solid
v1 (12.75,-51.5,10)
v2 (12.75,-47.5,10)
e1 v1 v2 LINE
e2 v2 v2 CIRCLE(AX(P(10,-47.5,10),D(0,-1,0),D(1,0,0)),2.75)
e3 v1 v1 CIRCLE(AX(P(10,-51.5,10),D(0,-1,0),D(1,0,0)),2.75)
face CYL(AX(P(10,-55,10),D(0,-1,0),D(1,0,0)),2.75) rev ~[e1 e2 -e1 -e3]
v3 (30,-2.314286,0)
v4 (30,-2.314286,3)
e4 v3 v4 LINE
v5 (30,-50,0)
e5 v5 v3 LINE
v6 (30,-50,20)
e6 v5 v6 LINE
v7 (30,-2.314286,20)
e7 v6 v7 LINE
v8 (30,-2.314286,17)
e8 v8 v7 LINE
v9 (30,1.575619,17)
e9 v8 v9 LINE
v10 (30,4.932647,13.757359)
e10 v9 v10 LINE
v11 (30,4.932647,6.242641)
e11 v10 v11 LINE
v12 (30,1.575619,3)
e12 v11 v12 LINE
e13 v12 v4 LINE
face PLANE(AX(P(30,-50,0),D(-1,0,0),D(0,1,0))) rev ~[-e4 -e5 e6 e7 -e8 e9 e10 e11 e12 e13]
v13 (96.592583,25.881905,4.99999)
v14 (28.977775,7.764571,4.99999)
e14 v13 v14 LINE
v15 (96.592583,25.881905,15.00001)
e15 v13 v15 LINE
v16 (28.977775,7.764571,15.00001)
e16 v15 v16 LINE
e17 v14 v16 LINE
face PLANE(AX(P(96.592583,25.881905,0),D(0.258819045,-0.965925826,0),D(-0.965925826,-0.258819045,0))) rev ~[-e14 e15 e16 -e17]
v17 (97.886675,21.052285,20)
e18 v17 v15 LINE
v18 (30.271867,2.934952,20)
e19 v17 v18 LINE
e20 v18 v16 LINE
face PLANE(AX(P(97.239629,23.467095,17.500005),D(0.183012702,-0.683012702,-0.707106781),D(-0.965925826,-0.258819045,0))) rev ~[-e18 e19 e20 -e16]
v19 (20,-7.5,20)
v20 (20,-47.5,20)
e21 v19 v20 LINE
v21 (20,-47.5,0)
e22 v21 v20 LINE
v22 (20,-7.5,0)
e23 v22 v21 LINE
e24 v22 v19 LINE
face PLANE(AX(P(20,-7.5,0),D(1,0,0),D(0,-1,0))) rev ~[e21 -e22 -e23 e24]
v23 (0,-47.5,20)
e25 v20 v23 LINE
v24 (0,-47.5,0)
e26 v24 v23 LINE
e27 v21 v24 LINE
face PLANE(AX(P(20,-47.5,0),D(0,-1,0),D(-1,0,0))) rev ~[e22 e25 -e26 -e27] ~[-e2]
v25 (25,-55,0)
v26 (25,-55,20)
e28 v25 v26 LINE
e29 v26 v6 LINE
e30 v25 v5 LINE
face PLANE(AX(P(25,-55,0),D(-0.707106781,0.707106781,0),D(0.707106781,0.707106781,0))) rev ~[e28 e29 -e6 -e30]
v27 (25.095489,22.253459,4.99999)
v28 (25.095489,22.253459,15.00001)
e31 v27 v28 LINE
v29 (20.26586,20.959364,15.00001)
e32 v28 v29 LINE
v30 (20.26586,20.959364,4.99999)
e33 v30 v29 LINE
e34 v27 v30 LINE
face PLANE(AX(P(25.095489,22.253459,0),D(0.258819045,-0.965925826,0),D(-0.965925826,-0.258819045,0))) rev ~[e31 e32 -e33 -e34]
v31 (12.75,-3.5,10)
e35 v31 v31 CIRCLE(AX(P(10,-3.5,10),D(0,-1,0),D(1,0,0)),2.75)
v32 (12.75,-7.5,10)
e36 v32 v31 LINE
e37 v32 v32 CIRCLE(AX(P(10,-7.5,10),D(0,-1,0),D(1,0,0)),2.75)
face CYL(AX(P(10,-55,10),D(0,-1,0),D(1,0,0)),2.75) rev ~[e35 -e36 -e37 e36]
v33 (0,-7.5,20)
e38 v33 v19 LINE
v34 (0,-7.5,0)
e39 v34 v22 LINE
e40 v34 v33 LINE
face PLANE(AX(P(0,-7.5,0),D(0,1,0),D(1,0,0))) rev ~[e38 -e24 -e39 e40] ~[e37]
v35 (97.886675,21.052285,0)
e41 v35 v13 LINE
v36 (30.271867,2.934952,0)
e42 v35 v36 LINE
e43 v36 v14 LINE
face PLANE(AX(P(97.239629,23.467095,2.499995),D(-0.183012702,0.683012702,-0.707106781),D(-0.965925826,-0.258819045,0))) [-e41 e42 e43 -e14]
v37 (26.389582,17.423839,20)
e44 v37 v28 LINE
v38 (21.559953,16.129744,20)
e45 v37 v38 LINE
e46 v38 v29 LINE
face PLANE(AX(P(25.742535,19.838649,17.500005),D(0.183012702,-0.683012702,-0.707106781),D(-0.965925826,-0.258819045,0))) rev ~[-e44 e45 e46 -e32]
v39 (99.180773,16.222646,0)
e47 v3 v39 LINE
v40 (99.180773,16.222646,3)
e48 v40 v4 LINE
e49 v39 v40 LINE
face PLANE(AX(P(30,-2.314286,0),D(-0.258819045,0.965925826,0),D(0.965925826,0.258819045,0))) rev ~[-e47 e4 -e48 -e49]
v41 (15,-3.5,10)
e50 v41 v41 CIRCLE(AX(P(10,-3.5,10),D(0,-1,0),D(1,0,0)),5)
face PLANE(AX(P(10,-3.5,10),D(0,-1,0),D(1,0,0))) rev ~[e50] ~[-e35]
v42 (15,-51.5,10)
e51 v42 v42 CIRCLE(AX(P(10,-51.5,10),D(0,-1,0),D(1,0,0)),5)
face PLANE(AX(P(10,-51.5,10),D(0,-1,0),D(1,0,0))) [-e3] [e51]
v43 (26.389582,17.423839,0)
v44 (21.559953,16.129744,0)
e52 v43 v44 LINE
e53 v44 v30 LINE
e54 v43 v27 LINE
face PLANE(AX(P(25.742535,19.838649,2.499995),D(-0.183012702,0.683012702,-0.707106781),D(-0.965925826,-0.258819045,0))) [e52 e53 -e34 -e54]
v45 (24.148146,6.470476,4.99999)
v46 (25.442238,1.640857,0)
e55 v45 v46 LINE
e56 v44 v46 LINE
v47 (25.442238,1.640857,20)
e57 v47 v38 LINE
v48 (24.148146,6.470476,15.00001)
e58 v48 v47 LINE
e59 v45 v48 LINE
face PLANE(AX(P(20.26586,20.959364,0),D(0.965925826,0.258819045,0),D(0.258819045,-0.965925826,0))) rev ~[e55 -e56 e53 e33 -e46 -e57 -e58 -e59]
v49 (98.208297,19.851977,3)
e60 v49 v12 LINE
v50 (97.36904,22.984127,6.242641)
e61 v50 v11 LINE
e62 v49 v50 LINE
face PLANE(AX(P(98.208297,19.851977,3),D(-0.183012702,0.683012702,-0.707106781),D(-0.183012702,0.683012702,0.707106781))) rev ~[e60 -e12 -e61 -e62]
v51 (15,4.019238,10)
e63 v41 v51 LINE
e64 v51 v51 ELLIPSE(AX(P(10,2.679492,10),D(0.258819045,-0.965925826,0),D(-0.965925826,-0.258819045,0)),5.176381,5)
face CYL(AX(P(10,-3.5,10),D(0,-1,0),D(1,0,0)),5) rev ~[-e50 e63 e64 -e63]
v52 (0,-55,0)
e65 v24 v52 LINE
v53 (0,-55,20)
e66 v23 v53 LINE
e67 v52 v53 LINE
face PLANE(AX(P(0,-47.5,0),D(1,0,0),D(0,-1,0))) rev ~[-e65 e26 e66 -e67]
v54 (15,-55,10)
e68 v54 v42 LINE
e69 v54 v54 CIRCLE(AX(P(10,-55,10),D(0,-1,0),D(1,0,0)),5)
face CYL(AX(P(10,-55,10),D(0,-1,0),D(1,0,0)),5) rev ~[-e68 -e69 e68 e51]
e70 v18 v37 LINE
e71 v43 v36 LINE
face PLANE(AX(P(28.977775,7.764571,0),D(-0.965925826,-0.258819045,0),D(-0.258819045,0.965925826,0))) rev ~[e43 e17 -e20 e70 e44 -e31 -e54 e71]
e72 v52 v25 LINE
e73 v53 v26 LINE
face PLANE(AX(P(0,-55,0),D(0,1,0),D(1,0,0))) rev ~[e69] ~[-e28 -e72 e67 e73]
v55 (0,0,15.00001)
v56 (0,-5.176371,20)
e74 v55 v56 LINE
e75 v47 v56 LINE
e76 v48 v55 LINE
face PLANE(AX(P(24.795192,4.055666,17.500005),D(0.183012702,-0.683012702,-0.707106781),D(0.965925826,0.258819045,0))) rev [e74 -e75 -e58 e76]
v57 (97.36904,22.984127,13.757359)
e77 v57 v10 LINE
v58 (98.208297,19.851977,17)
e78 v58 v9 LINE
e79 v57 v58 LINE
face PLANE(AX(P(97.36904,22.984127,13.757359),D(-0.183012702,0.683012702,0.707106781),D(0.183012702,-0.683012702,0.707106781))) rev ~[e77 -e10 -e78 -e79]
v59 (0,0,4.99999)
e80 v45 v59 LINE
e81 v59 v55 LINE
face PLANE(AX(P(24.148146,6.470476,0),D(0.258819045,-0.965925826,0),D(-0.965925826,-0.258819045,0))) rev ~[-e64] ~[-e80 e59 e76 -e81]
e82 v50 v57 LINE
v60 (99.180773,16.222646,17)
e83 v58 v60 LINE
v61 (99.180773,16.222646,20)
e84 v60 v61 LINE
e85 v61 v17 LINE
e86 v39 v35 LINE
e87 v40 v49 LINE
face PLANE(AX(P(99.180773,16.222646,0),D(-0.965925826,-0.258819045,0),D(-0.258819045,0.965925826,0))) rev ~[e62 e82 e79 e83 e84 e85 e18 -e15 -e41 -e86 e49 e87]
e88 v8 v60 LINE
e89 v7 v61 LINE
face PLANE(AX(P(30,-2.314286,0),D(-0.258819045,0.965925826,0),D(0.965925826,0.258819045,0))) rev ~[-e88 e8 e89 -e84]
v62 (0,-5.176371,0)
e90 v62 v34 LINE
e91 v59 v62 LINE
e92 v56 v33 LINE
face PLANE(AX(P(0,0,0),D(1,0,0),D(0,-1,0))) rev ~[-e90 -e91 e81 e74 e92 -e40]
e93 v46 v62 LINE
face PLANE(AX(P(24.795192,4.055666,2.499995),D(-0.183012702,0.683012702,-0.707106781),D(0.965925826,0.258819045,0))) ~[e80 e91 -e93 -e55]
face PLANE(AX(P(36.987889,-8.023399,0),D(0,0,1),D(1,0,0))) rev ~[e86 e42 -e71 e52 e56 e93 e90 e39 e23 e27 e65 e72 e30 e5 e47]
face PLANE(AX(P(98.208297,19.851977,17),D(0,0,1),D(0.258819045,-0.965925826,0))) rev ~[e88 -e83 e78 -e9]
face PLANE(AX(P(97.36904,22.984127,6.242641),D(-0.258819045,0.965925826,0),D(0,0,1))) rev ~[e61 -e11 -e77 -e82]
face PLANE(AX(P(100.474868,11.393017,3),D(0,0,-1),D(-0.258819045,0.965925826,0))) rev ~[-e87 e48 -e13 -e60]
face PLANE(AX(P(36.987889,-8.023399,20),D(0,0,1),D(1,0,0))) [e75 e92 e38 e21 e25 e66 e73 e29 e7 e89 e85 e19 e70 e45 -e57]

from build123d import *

# Parameters (mm, degrees)
F1_DEPTH  = 20
F2_R      = 2.75
F3_DEPTH  = 80.8829045103
F5_R      = 5
F6_DEPTH  = 29.3829045103
F7_R      = 5
F8_DEPTH  = 3.5
F9_SIZE   = 4.99999
F11_REACH = 132.6751363952


# Not quite as in the source:
# - a fillet or chamfer is up to 0.001 mm smaller than in the source, because OpenCascade refuses the exact size


with BuildPart() as f1:
    # F0 (on Top) → F1 (new body)
    with BuildSketch(Plane.XY):
        Polygon((24.1481456572, 6.4704761276), (0, 0), (0, -7.5), (20, -7.5), (20, -47.5), (0, -47.5), (0, -55), (25, -55), (30, -50), (30, -2.3142860312), (99.1807730799, 16.2226462474), (96.5925826289, 25.8819045103), (28.9777747887, 7.7645713531), (25.0954891121, 22.2534587474), (20.2658599807, 20.9593635219), align=None)
    extrude(amount=F1_DEPTH)

    # F2 (on face) → F3 (cut, through all)
    with BuildSketch(Plane.XZ.offset(55)):
        with Locations((10, 10)):
            Circle(F2_R)
    extrude(amount=-F3_DEPTH, mode=Mode.SUBTRACT)

    # F5 (on offset) → F6 (cut, through all)
    with BuildSketch(Plane.XZ.offset(3.5)):
        with Locations((10, 10)):
            Circle(F5_R)
    extrude(amount=-F6_DEPTH, mode=Mode.SUBTRACT)

    # F7 (on face) → F8 (cut)
    with BuildSketch(Plane.XZ.offset(55)):
        with Locations((10, 10)):
            Circle(F7_R)
    extrude(amount=-F8_DEPTH, mode=Mode.SUBTRACT)

    # F9 (size 5 in the source; OpenCascade refuses exactly that, so slightly less here)
    f9_edges = [f1.edges().sort_by_distance(p)[0] for p in [
        (62.785179, 16.823238, 0),
        (62.785179, 16.823238, 20),
        (12.074073, 3.235238, 20),
        (12.074073, 3.235238, 0),
        (22.680675, 21.606411, 20),
        (22.680675, 21.606411, 0),
    ]]
    chamfer(f9_edges, length=F9_SIZE)

    f11_end = Plane(origin=(30, -26.1571430156, 10), x_dir=(0, 0, 1), z_dir=(1, 0, 0))
    # F10 (on face) → F11 (cut, up to a plane its end follows)
    with BuildSketch(Plane(origin=(96.5925826289, 25.8819045103, 0), x_dir=(-0.2588190451, 0.9659258263, 0), z_dir=(0.9659258263, 0.2588190451, 0))):
        Polygon((-3, 13.7573593129), (-6.2426406871, 17), (-15, 17), (-15, 3), (-6.2426406871, 3), (-3, 6.2426406871), align=None)
    f11_long = extrude(amount=-F11_REACH, mode=Mode.PRIVATE)
    add(split(f11_long, bisect_by=f11_end, keep=Keep.TOP, mode=Mode.PRIVATE), mode=Mode.SUBTRACT)


solid = f1.part
